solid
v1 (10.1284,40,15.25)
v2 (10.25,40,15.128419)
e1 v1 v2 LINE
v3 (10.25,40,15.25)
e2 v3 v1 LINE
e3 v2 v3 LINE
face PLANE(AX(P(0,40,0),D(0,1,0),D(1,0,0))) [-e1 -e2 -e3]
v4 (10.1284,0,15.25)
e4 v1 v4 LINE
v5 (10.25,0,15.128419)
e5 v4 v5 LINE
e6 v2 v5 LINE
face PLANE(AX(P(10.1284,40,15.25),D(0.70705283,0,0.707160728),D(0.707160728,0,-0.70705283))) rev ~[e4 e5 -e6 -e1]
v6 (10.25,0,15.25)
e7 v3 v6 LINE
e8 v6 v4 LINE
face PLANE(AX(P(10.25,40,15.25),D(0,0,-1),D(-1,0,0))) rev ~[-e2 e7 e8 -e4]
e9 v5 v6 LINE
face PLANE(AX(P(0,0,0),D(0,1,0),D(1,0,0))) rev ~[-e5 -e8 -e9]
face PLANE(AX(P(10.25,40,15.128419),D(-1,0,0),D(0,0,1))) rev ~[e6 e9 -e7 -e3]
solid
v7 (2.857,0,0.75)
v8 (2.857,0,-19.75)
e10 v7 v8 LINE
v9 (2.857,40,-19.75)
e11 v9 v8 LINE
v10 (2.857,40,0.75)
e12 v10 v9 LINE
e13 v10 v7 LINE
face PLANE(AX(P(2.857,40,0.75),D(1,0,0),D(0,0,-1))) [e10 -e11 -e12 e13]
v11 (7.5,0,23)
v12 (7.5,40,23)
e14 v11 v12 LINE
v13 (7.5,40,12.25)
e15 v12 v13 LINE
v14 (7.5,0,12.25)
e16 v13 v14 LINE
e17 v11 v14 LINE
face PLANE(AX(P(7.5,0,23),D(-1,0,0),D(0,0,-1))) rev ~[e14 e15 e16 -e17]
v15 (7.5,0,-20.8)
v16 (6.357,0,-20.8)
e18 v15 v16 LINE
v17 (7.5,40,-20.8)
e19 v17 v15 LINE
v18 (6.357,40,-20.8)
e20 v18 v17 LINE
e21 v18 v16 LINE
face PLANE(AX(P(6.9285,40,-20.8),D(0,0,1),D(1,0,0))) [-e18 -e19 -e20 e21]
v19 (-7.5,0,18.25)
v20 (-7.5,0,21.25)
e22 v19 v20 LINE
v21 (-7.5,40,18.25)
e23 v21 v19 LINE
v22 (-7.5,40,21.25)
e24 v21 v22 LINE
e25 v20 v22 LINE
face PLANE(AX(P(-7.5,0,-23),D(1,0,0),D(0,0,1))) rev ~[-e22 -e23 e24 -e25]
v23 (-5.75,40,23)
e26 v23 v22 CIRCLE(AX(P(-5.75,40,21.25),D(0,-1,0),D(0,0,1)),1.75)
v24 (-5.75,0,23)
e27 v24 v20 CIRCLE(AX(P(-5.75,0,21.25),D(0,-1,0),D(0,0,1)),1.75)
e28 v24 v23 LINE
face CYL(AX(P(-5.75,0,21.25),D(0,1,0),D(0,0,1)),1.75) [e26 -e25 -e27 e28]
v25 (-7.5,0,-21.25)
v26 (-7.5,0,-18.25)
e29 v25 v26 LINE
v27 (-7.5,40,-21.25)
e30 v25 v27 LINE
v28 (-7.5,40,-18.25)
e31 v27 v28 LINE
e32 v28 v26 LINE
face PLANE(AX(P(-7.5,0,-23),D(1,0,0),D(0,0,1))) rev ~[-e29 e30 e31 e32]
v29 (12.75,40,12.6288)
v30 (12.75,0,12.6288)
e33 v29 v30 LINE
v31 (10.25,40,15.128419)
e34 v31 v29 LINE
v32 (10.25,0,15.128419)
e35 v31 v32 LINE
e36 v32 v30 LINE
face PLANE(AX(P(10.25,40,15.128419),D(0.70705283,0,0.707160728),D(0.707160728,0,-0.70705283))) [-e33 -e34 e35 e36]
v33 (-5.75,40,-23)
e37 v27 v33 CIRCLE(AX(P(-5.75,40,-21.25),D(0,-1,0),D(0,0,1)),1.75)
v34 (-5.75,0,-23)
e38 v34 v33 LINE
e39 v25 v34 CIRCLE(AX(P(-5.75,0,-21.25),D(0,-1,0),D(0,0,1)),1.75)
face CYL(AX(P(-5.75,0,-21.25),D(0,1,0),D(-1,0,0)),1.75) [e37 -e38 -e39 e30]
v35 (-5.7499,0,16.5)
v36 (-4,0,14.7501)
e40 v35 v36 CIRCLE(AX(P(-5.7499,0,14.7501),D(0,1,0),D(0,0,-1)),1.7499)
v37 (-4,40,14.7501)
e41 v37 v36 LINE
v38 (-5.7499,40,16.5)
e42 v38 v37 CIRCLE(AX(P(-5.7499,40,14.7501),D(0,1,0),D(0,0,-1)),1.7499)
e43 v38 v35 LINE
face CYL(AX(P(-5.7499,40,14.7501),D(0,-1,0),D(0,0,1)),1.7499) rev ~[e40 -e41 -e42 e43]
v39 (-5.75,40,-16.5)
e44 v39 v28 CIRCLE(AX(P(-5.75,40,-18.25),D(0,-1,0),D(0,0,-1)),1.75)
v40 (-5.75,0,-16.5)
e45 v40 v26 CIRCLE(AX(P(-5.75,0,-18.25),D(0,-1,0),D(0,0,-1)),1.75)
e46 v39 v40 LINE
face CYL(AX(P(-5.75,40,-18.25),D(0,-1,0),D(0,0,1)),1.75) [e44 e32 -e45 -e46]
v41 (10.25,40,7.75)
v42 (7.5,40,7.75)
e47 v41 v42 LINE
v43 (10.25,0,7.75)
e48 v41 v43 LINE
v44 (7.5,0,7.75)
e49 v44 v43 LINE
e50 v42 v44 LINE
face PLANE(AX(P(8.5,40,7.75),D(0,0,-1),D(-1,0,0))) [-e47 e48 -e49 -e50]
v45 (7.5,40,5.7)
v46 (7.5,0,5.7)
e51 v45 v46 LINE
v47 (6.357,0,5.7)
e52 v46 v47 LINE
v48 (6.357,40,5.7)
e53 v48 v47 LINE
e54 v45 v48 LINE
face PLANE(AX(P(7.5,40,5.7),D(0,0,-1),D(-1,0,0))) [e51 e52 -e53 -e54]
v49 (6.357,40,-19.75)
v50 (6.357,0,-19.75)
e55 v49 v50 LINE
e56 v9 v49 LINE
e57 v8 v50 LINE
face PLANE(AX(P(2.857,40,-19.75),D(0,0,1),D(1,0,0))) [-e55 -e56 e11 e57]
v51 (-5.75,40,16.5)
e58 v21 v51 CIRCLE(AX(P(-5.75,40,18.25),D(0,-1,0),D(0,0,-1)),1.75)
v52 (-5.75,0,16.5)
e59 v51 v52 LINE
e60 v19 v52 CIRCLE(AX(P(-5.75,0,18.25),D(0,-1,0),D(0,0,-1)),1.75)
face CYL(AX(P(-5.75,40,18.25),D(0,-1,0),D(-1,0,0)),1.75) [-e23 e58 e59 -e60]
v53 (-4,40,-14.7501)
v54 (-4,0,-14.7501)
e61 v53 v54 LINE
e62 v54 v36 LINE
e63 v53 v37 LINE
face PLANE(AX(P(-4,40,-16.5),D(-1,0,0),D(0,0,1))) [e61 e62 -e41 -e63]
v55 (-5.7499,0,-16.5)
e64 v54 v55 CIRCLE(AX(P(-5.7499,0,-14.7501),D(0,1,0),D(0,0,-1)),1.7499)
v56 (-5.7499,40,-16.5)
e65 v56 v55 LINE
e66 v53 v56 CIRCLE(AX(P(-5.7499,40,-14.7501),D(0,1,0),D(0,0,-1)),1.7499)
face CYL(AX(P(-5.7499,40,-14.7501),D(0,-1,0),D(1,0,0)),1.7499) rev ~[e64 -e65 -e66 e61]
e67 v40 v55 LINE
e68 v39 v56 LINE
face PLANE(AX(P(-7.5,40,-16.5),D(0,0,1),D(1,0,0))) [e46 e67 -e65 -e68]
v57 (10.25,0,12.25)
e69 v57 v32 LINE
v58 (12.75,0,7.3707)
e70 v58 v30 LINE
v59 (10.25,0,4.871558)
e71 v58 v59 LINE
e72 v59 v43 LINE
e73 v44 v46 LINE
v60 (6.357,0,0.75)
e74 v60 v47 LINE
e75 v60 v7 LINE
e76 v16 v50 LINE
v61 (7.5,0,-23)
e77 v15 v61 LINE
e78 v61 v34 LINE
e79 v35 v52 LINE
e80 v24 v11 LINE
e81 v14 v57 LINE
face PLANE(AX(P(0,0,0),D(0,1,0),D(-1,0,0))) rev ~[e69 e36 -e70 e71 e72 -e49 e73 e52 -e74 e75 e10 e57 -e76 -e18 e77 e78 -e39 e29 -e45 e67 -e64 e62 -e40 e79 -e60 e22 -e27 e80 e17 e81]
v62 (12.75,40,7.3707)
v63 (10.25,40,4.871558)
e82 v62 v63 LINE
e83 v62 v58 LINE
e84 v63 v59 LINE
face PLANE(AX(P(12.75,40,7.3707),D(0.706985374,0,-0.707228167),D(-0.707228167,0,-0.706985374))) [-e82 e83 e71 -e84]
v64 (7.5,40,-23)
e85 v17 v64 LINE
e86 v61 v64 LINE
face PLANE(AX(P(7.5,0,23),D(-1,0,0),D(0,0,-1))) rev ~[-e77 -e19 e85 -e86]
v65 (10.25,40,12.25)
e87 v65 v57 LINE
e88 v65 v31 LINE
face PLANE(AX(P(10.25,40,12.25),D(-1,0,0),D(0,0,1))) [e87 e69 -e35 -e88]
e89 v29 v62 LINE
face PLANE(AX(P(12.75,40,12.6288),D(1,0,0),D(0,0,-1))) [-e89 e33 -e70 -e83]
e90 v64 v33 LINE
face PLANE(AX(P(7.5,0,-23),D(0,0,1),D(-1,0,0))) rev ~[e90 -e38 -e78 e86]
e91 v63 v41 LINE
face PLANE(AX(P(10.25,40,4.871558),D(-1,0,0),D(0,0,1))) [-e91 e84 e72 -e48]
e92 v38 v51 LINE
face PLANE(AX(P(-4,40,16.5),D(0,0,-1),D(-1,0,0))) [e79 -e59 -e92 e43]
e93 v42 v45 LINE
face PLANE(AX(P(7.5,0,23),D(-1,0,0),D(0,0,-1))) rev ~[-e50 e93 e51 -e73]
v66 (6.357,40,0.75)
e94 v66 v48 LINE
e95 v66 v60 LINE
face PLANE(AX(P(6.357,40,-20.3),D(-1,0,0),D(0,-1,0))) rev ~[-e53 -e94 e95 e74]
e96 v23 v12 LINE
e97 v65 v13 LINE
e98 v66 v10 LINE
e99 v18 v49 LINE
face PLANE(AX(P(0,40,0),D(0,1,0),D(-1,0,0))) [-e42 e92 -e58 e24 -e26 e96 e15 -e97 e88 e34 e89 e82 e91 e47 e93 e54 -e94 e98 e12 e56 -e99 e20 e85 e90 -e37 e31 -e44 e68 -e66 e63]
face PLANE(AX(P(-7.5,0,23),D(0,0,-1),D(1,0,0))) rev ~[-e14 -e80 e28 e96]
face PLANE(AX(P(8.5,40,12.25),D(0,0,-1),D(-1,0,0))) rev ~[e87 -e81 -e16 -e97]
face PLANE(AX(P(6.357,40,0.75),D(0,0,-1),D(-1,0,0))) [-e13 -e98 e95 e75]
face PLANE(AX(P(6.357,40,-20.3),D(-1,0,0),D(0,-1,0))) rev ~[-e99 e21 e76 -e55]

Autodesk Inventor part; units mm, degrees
ref_plane "YZ Plane" through (0, 0, 0) normal (1, 0, 0) x (0, 1, 0)
ref_plane "XZ Plane" through (0, 0, 0) normal (0, 1, 0) x (-1, 0, 0)
ref_plane "XY Plane" through (0, 0, 0) normal (0, 0, 1) x (1, 0, 0)
sketch "Sketch1" plane through (0, 0, 0) normal (0, 1, 0) x (-1, 0, 0)
  line L0 (-7.5, -23) -> (7.5, -23)
  line L1 (7.5, -23) -> (7.5, 23)
  line L2 (7.5, 23) -> (-7.5, 23)
  line L3 (-7.5, 23) -> (-7.5, -23)
  line L4 (-7.5, -23) -> (7.5, 23) construction
  line L5 (7.5, -23) -> (-7.5, 23) construction
  point P0 (0, 0)
  dimension "d0" = 15
  dimension "d1" = 46
extrude "Extrusion1" add sketch "Sketch1" along normal blind 40
sketch "Sketch2" plane through (0, 40, 0) normal (0, 1, 0) x (1, 0, 0)
  line L0 (7.5, -23) -> (7.5, 23) projected
  line L1 (7.5, 23) -> (-7.5, 23) projected
  line L2 (7.5, 23) -> (6.9285, 23)
  line L3 (6.9285, 23) -> (6.9285, 7.3)
  line L4 (6.357, 20.3) -> (7.5, 20.3)
  line L5 (7.5, 20.3) -> (7.5, -5.7)
  line L6 (7.5, -5.7) -> (6.357, -5.7)
  line L7 (6.357, -5.7) -> (6.357, 20.3)
  line L8 (6.357, 20.3) -> (7.5, -5.7) construction
  line L9 (7.5, 20.3) -> (6.357, -5.7) construction
  point P0 (7.5, -5.7)
  point P1 (7.5, 20.3)
  dimension "d7" = 0.5715
  dimension "d8" = 15.7
  dimension "d9" = 90
  dimension "d10" = 1.143
  dimension "d11" = 26
extrude "Extrusion2" cut sketch "Sketch2" against normal through all contours L6 L7 L4 L0
sketch "Sketch3" plane through (0, 40, 0) normal (0, 1, 0) x (1, 0, 0)
  line L0 (6.357, -5.7) -> (6.357, 20.3) projected
  line L1 (5.607, 9.5) -> (4.607, 9.5)
  line L2 (2.857, 19.75) -> (6.357, 19.75)
  line L3 (6.357, 19.75) -> (6.357, -0.75)
  line L4 (6.357, -0.75) -> (2.857, -0.75)
  line L5 (2.857, -0.75) -> (2.857, 19.75)
  line L6 (2.857, 19.75) -> (6.357, -0.75) construction
  line L7 (6.357, 19.75) -> (2.857, -0.75) construction
  line L8 (7.5, 23) -> (-7.5, 23) projected
  point P0 (6.357, -0.75)
  point P1 (6.357, 19.75)
  dimension "d51" = 1
  dimension "d53" = 3.5
  dimension "d54" = 20.5
  dimension "d59" = 3.5
  dimension "d60" = 90
  dimension "d61" = 13.5
sketch "Sketch4" plane through (0, 40, 0) normal (0, 1, 0) x (1, 0, 0)
  line L0 (7.5, -23) -> (7.5, -5.7) projected
  line L1 (7.5, -23) -> (7.5, -10)
  line L2 (7.5, -10) -> (9.5, -10)
  line L3 (9.5, -10) -> (9.5, -16)
  line L4 (9.5, -10) -> (9.5, -4)
  line L5 (9.5, -10) -> (13.5, -10)
  line L6 (13.5, -10) -> (13.5, -12.9395)
  line L7 (13.5, -10) -> (13.5, -7.06)
  line L8 (9.5, -16) -> (10.439, -16)
  line L9 (9.5, -4) -> (10.439, -4)
  line L10 (10.439, -4) -> (13.5, -7.06)
  line L11 (13.5, -12.9395) -> (10.439, -16)
  line L12 (9.5, -10) -> (9.5, -13)
  line L13 (9.5, -10) -> (9.5, -7)
  line L14 (9.5, -10) -> (12.5, -10) construction
  line L15 (9.5, -7) -> (7.5, -7)
  line L16 (9.5, -13) -> (7.5, -13)
  line L17 (7.5, -13) -> (7.5, -7)
  line L18 (10.25, -10.95) -> (10.25, -15.25)
  line L19 (10.25, -15.25) -> (10.1284, -15.25)
  line L20 (10.1284, -15.25) -> (12.75, -12.6288)
  line L21 (12.75, -12.6288) -> (12.75, -13)
  line L22 (12.75, -13) -> (12.75, -7.3707)
  line L23 (12.75, -7.3707) -> (10.1284, -4.75)
  line L24 (10.1284, -4.75) -> (10.25, -4.75)
  line L25 (10.25, -4.75) -> (10.25, -10.25)
  line L26 (10.25, -13.1) -> (12.45, -13.1) construction
  line L27 (10.25, -7.5) -> (12.15, -7.5) construction
  line L28 (7.5, -23) -> (7.5, -5.7) projected
  line L29 (10.25, -10.95) -> (10.25, -10.25)
  line L30 (8.5, -13) -> (8.5, -12.25)
  line L31 (8.5, -12.25) -> (10.25, -12.25)
  line L32 (8.5, -12.25) -> (7.5, -12.25)
  line L33 (8.5, -7) -> (8.5, -7.75)
  line L34 (8.5, -7.75) -> (7.5, -7.75)
  line L35 (8.5, -7.75) -> (10.25, -7.75)
  point P0 (0, 0)
  point P1 (9.5, -7)
  point P2 (7.5, -7)
  point P3 (9.5, -7.1)
  point P4 (10.25, -10)
  point P5 (12.75, -10)
  point P6 (10.25, -13)
  point P7 (7.75, -10.75)
  point P8 (10.25, -4.8715)
  point P9 (10.25, -15.1284)
  dimension "d19" = 13
  dimension "d20" = 2
  dimension "d21" = 6
  dimension "d22" = 6
  dimension "d23" = 4
  dimension "d24" = 2.9395
  dimension "d25" = 2.94
  dimension "d26" = 0.939
  dimension "d27" = 0.939
  dimension "d28" = 3
  dimension "d29" = 3
  dimension "d30" = 90
  dimension "d31" = 0.75
  dimension "d32" = 0.75
  dimension "d47" = 0.75
  dimension "d48" = 0.75
extrude "Extrusion5" add sketch "Sketch4" against normal up to surface (40 mm away) contours L0 L2 L3 L31 L32 | L0 L34 L35 L4 L2 | L18 L19 L20 | L5 L25 L29 L18 L31 L3 | L4 L35 L25 L5 | L25 L23 L22 L5 | L5 L22 L20 L18 L29 L25
sketch "Sketch5" plane through (0, 40, 0) normal (0, 1, 0) x (1, 0, 0)
  line L0 (-11, 16.5) -> (-4, 16.5)
  line L1 (-4, 16.5) -> (-4, -16.5)
  line L2 (-4, -16.5) -> (-11, -16.5)
  line L3 (-11, -16.5) -> (-11, 16.5)
  line L4 (-7.5, 23) -> (-7.5, -23) projected
  line L5 (-11, 16.5) -> (-4, -16.5) construction
  line L6 (-4, 16.5) -> (-11, -16.5) construction
  point P0 (0, 0)
  point P1 (-7.5, 0)
  point P2 (-7.5, 16.5)
  point P3 (-7.5, -16.5)
  dimension "d41" = 7
  dimension "d42" = 33
extrude "Extrusion6" cut sketch "Sketch5" against normal through all contours L0 L1 L2 L4
fillet "Fillet1" radius 1.75 4 edges at (-7.5, 20, 16.5) (-7.5, 20, 23) (-7.5, 20, -16.5) (-7.5, 20, -23)
fillet "Fillet2" radius 1.75 2 edges at (-4, 20, -16.5) (-4, 20, 16.5)
move faces "Move3" translate (0, 0, -0.5) faces at (7.119, 26.6667, -20.3)
extrude "Extrusion7" cut sketch "Sketch3" against normal through all
properties part number "Tape_Belt_Layer"
